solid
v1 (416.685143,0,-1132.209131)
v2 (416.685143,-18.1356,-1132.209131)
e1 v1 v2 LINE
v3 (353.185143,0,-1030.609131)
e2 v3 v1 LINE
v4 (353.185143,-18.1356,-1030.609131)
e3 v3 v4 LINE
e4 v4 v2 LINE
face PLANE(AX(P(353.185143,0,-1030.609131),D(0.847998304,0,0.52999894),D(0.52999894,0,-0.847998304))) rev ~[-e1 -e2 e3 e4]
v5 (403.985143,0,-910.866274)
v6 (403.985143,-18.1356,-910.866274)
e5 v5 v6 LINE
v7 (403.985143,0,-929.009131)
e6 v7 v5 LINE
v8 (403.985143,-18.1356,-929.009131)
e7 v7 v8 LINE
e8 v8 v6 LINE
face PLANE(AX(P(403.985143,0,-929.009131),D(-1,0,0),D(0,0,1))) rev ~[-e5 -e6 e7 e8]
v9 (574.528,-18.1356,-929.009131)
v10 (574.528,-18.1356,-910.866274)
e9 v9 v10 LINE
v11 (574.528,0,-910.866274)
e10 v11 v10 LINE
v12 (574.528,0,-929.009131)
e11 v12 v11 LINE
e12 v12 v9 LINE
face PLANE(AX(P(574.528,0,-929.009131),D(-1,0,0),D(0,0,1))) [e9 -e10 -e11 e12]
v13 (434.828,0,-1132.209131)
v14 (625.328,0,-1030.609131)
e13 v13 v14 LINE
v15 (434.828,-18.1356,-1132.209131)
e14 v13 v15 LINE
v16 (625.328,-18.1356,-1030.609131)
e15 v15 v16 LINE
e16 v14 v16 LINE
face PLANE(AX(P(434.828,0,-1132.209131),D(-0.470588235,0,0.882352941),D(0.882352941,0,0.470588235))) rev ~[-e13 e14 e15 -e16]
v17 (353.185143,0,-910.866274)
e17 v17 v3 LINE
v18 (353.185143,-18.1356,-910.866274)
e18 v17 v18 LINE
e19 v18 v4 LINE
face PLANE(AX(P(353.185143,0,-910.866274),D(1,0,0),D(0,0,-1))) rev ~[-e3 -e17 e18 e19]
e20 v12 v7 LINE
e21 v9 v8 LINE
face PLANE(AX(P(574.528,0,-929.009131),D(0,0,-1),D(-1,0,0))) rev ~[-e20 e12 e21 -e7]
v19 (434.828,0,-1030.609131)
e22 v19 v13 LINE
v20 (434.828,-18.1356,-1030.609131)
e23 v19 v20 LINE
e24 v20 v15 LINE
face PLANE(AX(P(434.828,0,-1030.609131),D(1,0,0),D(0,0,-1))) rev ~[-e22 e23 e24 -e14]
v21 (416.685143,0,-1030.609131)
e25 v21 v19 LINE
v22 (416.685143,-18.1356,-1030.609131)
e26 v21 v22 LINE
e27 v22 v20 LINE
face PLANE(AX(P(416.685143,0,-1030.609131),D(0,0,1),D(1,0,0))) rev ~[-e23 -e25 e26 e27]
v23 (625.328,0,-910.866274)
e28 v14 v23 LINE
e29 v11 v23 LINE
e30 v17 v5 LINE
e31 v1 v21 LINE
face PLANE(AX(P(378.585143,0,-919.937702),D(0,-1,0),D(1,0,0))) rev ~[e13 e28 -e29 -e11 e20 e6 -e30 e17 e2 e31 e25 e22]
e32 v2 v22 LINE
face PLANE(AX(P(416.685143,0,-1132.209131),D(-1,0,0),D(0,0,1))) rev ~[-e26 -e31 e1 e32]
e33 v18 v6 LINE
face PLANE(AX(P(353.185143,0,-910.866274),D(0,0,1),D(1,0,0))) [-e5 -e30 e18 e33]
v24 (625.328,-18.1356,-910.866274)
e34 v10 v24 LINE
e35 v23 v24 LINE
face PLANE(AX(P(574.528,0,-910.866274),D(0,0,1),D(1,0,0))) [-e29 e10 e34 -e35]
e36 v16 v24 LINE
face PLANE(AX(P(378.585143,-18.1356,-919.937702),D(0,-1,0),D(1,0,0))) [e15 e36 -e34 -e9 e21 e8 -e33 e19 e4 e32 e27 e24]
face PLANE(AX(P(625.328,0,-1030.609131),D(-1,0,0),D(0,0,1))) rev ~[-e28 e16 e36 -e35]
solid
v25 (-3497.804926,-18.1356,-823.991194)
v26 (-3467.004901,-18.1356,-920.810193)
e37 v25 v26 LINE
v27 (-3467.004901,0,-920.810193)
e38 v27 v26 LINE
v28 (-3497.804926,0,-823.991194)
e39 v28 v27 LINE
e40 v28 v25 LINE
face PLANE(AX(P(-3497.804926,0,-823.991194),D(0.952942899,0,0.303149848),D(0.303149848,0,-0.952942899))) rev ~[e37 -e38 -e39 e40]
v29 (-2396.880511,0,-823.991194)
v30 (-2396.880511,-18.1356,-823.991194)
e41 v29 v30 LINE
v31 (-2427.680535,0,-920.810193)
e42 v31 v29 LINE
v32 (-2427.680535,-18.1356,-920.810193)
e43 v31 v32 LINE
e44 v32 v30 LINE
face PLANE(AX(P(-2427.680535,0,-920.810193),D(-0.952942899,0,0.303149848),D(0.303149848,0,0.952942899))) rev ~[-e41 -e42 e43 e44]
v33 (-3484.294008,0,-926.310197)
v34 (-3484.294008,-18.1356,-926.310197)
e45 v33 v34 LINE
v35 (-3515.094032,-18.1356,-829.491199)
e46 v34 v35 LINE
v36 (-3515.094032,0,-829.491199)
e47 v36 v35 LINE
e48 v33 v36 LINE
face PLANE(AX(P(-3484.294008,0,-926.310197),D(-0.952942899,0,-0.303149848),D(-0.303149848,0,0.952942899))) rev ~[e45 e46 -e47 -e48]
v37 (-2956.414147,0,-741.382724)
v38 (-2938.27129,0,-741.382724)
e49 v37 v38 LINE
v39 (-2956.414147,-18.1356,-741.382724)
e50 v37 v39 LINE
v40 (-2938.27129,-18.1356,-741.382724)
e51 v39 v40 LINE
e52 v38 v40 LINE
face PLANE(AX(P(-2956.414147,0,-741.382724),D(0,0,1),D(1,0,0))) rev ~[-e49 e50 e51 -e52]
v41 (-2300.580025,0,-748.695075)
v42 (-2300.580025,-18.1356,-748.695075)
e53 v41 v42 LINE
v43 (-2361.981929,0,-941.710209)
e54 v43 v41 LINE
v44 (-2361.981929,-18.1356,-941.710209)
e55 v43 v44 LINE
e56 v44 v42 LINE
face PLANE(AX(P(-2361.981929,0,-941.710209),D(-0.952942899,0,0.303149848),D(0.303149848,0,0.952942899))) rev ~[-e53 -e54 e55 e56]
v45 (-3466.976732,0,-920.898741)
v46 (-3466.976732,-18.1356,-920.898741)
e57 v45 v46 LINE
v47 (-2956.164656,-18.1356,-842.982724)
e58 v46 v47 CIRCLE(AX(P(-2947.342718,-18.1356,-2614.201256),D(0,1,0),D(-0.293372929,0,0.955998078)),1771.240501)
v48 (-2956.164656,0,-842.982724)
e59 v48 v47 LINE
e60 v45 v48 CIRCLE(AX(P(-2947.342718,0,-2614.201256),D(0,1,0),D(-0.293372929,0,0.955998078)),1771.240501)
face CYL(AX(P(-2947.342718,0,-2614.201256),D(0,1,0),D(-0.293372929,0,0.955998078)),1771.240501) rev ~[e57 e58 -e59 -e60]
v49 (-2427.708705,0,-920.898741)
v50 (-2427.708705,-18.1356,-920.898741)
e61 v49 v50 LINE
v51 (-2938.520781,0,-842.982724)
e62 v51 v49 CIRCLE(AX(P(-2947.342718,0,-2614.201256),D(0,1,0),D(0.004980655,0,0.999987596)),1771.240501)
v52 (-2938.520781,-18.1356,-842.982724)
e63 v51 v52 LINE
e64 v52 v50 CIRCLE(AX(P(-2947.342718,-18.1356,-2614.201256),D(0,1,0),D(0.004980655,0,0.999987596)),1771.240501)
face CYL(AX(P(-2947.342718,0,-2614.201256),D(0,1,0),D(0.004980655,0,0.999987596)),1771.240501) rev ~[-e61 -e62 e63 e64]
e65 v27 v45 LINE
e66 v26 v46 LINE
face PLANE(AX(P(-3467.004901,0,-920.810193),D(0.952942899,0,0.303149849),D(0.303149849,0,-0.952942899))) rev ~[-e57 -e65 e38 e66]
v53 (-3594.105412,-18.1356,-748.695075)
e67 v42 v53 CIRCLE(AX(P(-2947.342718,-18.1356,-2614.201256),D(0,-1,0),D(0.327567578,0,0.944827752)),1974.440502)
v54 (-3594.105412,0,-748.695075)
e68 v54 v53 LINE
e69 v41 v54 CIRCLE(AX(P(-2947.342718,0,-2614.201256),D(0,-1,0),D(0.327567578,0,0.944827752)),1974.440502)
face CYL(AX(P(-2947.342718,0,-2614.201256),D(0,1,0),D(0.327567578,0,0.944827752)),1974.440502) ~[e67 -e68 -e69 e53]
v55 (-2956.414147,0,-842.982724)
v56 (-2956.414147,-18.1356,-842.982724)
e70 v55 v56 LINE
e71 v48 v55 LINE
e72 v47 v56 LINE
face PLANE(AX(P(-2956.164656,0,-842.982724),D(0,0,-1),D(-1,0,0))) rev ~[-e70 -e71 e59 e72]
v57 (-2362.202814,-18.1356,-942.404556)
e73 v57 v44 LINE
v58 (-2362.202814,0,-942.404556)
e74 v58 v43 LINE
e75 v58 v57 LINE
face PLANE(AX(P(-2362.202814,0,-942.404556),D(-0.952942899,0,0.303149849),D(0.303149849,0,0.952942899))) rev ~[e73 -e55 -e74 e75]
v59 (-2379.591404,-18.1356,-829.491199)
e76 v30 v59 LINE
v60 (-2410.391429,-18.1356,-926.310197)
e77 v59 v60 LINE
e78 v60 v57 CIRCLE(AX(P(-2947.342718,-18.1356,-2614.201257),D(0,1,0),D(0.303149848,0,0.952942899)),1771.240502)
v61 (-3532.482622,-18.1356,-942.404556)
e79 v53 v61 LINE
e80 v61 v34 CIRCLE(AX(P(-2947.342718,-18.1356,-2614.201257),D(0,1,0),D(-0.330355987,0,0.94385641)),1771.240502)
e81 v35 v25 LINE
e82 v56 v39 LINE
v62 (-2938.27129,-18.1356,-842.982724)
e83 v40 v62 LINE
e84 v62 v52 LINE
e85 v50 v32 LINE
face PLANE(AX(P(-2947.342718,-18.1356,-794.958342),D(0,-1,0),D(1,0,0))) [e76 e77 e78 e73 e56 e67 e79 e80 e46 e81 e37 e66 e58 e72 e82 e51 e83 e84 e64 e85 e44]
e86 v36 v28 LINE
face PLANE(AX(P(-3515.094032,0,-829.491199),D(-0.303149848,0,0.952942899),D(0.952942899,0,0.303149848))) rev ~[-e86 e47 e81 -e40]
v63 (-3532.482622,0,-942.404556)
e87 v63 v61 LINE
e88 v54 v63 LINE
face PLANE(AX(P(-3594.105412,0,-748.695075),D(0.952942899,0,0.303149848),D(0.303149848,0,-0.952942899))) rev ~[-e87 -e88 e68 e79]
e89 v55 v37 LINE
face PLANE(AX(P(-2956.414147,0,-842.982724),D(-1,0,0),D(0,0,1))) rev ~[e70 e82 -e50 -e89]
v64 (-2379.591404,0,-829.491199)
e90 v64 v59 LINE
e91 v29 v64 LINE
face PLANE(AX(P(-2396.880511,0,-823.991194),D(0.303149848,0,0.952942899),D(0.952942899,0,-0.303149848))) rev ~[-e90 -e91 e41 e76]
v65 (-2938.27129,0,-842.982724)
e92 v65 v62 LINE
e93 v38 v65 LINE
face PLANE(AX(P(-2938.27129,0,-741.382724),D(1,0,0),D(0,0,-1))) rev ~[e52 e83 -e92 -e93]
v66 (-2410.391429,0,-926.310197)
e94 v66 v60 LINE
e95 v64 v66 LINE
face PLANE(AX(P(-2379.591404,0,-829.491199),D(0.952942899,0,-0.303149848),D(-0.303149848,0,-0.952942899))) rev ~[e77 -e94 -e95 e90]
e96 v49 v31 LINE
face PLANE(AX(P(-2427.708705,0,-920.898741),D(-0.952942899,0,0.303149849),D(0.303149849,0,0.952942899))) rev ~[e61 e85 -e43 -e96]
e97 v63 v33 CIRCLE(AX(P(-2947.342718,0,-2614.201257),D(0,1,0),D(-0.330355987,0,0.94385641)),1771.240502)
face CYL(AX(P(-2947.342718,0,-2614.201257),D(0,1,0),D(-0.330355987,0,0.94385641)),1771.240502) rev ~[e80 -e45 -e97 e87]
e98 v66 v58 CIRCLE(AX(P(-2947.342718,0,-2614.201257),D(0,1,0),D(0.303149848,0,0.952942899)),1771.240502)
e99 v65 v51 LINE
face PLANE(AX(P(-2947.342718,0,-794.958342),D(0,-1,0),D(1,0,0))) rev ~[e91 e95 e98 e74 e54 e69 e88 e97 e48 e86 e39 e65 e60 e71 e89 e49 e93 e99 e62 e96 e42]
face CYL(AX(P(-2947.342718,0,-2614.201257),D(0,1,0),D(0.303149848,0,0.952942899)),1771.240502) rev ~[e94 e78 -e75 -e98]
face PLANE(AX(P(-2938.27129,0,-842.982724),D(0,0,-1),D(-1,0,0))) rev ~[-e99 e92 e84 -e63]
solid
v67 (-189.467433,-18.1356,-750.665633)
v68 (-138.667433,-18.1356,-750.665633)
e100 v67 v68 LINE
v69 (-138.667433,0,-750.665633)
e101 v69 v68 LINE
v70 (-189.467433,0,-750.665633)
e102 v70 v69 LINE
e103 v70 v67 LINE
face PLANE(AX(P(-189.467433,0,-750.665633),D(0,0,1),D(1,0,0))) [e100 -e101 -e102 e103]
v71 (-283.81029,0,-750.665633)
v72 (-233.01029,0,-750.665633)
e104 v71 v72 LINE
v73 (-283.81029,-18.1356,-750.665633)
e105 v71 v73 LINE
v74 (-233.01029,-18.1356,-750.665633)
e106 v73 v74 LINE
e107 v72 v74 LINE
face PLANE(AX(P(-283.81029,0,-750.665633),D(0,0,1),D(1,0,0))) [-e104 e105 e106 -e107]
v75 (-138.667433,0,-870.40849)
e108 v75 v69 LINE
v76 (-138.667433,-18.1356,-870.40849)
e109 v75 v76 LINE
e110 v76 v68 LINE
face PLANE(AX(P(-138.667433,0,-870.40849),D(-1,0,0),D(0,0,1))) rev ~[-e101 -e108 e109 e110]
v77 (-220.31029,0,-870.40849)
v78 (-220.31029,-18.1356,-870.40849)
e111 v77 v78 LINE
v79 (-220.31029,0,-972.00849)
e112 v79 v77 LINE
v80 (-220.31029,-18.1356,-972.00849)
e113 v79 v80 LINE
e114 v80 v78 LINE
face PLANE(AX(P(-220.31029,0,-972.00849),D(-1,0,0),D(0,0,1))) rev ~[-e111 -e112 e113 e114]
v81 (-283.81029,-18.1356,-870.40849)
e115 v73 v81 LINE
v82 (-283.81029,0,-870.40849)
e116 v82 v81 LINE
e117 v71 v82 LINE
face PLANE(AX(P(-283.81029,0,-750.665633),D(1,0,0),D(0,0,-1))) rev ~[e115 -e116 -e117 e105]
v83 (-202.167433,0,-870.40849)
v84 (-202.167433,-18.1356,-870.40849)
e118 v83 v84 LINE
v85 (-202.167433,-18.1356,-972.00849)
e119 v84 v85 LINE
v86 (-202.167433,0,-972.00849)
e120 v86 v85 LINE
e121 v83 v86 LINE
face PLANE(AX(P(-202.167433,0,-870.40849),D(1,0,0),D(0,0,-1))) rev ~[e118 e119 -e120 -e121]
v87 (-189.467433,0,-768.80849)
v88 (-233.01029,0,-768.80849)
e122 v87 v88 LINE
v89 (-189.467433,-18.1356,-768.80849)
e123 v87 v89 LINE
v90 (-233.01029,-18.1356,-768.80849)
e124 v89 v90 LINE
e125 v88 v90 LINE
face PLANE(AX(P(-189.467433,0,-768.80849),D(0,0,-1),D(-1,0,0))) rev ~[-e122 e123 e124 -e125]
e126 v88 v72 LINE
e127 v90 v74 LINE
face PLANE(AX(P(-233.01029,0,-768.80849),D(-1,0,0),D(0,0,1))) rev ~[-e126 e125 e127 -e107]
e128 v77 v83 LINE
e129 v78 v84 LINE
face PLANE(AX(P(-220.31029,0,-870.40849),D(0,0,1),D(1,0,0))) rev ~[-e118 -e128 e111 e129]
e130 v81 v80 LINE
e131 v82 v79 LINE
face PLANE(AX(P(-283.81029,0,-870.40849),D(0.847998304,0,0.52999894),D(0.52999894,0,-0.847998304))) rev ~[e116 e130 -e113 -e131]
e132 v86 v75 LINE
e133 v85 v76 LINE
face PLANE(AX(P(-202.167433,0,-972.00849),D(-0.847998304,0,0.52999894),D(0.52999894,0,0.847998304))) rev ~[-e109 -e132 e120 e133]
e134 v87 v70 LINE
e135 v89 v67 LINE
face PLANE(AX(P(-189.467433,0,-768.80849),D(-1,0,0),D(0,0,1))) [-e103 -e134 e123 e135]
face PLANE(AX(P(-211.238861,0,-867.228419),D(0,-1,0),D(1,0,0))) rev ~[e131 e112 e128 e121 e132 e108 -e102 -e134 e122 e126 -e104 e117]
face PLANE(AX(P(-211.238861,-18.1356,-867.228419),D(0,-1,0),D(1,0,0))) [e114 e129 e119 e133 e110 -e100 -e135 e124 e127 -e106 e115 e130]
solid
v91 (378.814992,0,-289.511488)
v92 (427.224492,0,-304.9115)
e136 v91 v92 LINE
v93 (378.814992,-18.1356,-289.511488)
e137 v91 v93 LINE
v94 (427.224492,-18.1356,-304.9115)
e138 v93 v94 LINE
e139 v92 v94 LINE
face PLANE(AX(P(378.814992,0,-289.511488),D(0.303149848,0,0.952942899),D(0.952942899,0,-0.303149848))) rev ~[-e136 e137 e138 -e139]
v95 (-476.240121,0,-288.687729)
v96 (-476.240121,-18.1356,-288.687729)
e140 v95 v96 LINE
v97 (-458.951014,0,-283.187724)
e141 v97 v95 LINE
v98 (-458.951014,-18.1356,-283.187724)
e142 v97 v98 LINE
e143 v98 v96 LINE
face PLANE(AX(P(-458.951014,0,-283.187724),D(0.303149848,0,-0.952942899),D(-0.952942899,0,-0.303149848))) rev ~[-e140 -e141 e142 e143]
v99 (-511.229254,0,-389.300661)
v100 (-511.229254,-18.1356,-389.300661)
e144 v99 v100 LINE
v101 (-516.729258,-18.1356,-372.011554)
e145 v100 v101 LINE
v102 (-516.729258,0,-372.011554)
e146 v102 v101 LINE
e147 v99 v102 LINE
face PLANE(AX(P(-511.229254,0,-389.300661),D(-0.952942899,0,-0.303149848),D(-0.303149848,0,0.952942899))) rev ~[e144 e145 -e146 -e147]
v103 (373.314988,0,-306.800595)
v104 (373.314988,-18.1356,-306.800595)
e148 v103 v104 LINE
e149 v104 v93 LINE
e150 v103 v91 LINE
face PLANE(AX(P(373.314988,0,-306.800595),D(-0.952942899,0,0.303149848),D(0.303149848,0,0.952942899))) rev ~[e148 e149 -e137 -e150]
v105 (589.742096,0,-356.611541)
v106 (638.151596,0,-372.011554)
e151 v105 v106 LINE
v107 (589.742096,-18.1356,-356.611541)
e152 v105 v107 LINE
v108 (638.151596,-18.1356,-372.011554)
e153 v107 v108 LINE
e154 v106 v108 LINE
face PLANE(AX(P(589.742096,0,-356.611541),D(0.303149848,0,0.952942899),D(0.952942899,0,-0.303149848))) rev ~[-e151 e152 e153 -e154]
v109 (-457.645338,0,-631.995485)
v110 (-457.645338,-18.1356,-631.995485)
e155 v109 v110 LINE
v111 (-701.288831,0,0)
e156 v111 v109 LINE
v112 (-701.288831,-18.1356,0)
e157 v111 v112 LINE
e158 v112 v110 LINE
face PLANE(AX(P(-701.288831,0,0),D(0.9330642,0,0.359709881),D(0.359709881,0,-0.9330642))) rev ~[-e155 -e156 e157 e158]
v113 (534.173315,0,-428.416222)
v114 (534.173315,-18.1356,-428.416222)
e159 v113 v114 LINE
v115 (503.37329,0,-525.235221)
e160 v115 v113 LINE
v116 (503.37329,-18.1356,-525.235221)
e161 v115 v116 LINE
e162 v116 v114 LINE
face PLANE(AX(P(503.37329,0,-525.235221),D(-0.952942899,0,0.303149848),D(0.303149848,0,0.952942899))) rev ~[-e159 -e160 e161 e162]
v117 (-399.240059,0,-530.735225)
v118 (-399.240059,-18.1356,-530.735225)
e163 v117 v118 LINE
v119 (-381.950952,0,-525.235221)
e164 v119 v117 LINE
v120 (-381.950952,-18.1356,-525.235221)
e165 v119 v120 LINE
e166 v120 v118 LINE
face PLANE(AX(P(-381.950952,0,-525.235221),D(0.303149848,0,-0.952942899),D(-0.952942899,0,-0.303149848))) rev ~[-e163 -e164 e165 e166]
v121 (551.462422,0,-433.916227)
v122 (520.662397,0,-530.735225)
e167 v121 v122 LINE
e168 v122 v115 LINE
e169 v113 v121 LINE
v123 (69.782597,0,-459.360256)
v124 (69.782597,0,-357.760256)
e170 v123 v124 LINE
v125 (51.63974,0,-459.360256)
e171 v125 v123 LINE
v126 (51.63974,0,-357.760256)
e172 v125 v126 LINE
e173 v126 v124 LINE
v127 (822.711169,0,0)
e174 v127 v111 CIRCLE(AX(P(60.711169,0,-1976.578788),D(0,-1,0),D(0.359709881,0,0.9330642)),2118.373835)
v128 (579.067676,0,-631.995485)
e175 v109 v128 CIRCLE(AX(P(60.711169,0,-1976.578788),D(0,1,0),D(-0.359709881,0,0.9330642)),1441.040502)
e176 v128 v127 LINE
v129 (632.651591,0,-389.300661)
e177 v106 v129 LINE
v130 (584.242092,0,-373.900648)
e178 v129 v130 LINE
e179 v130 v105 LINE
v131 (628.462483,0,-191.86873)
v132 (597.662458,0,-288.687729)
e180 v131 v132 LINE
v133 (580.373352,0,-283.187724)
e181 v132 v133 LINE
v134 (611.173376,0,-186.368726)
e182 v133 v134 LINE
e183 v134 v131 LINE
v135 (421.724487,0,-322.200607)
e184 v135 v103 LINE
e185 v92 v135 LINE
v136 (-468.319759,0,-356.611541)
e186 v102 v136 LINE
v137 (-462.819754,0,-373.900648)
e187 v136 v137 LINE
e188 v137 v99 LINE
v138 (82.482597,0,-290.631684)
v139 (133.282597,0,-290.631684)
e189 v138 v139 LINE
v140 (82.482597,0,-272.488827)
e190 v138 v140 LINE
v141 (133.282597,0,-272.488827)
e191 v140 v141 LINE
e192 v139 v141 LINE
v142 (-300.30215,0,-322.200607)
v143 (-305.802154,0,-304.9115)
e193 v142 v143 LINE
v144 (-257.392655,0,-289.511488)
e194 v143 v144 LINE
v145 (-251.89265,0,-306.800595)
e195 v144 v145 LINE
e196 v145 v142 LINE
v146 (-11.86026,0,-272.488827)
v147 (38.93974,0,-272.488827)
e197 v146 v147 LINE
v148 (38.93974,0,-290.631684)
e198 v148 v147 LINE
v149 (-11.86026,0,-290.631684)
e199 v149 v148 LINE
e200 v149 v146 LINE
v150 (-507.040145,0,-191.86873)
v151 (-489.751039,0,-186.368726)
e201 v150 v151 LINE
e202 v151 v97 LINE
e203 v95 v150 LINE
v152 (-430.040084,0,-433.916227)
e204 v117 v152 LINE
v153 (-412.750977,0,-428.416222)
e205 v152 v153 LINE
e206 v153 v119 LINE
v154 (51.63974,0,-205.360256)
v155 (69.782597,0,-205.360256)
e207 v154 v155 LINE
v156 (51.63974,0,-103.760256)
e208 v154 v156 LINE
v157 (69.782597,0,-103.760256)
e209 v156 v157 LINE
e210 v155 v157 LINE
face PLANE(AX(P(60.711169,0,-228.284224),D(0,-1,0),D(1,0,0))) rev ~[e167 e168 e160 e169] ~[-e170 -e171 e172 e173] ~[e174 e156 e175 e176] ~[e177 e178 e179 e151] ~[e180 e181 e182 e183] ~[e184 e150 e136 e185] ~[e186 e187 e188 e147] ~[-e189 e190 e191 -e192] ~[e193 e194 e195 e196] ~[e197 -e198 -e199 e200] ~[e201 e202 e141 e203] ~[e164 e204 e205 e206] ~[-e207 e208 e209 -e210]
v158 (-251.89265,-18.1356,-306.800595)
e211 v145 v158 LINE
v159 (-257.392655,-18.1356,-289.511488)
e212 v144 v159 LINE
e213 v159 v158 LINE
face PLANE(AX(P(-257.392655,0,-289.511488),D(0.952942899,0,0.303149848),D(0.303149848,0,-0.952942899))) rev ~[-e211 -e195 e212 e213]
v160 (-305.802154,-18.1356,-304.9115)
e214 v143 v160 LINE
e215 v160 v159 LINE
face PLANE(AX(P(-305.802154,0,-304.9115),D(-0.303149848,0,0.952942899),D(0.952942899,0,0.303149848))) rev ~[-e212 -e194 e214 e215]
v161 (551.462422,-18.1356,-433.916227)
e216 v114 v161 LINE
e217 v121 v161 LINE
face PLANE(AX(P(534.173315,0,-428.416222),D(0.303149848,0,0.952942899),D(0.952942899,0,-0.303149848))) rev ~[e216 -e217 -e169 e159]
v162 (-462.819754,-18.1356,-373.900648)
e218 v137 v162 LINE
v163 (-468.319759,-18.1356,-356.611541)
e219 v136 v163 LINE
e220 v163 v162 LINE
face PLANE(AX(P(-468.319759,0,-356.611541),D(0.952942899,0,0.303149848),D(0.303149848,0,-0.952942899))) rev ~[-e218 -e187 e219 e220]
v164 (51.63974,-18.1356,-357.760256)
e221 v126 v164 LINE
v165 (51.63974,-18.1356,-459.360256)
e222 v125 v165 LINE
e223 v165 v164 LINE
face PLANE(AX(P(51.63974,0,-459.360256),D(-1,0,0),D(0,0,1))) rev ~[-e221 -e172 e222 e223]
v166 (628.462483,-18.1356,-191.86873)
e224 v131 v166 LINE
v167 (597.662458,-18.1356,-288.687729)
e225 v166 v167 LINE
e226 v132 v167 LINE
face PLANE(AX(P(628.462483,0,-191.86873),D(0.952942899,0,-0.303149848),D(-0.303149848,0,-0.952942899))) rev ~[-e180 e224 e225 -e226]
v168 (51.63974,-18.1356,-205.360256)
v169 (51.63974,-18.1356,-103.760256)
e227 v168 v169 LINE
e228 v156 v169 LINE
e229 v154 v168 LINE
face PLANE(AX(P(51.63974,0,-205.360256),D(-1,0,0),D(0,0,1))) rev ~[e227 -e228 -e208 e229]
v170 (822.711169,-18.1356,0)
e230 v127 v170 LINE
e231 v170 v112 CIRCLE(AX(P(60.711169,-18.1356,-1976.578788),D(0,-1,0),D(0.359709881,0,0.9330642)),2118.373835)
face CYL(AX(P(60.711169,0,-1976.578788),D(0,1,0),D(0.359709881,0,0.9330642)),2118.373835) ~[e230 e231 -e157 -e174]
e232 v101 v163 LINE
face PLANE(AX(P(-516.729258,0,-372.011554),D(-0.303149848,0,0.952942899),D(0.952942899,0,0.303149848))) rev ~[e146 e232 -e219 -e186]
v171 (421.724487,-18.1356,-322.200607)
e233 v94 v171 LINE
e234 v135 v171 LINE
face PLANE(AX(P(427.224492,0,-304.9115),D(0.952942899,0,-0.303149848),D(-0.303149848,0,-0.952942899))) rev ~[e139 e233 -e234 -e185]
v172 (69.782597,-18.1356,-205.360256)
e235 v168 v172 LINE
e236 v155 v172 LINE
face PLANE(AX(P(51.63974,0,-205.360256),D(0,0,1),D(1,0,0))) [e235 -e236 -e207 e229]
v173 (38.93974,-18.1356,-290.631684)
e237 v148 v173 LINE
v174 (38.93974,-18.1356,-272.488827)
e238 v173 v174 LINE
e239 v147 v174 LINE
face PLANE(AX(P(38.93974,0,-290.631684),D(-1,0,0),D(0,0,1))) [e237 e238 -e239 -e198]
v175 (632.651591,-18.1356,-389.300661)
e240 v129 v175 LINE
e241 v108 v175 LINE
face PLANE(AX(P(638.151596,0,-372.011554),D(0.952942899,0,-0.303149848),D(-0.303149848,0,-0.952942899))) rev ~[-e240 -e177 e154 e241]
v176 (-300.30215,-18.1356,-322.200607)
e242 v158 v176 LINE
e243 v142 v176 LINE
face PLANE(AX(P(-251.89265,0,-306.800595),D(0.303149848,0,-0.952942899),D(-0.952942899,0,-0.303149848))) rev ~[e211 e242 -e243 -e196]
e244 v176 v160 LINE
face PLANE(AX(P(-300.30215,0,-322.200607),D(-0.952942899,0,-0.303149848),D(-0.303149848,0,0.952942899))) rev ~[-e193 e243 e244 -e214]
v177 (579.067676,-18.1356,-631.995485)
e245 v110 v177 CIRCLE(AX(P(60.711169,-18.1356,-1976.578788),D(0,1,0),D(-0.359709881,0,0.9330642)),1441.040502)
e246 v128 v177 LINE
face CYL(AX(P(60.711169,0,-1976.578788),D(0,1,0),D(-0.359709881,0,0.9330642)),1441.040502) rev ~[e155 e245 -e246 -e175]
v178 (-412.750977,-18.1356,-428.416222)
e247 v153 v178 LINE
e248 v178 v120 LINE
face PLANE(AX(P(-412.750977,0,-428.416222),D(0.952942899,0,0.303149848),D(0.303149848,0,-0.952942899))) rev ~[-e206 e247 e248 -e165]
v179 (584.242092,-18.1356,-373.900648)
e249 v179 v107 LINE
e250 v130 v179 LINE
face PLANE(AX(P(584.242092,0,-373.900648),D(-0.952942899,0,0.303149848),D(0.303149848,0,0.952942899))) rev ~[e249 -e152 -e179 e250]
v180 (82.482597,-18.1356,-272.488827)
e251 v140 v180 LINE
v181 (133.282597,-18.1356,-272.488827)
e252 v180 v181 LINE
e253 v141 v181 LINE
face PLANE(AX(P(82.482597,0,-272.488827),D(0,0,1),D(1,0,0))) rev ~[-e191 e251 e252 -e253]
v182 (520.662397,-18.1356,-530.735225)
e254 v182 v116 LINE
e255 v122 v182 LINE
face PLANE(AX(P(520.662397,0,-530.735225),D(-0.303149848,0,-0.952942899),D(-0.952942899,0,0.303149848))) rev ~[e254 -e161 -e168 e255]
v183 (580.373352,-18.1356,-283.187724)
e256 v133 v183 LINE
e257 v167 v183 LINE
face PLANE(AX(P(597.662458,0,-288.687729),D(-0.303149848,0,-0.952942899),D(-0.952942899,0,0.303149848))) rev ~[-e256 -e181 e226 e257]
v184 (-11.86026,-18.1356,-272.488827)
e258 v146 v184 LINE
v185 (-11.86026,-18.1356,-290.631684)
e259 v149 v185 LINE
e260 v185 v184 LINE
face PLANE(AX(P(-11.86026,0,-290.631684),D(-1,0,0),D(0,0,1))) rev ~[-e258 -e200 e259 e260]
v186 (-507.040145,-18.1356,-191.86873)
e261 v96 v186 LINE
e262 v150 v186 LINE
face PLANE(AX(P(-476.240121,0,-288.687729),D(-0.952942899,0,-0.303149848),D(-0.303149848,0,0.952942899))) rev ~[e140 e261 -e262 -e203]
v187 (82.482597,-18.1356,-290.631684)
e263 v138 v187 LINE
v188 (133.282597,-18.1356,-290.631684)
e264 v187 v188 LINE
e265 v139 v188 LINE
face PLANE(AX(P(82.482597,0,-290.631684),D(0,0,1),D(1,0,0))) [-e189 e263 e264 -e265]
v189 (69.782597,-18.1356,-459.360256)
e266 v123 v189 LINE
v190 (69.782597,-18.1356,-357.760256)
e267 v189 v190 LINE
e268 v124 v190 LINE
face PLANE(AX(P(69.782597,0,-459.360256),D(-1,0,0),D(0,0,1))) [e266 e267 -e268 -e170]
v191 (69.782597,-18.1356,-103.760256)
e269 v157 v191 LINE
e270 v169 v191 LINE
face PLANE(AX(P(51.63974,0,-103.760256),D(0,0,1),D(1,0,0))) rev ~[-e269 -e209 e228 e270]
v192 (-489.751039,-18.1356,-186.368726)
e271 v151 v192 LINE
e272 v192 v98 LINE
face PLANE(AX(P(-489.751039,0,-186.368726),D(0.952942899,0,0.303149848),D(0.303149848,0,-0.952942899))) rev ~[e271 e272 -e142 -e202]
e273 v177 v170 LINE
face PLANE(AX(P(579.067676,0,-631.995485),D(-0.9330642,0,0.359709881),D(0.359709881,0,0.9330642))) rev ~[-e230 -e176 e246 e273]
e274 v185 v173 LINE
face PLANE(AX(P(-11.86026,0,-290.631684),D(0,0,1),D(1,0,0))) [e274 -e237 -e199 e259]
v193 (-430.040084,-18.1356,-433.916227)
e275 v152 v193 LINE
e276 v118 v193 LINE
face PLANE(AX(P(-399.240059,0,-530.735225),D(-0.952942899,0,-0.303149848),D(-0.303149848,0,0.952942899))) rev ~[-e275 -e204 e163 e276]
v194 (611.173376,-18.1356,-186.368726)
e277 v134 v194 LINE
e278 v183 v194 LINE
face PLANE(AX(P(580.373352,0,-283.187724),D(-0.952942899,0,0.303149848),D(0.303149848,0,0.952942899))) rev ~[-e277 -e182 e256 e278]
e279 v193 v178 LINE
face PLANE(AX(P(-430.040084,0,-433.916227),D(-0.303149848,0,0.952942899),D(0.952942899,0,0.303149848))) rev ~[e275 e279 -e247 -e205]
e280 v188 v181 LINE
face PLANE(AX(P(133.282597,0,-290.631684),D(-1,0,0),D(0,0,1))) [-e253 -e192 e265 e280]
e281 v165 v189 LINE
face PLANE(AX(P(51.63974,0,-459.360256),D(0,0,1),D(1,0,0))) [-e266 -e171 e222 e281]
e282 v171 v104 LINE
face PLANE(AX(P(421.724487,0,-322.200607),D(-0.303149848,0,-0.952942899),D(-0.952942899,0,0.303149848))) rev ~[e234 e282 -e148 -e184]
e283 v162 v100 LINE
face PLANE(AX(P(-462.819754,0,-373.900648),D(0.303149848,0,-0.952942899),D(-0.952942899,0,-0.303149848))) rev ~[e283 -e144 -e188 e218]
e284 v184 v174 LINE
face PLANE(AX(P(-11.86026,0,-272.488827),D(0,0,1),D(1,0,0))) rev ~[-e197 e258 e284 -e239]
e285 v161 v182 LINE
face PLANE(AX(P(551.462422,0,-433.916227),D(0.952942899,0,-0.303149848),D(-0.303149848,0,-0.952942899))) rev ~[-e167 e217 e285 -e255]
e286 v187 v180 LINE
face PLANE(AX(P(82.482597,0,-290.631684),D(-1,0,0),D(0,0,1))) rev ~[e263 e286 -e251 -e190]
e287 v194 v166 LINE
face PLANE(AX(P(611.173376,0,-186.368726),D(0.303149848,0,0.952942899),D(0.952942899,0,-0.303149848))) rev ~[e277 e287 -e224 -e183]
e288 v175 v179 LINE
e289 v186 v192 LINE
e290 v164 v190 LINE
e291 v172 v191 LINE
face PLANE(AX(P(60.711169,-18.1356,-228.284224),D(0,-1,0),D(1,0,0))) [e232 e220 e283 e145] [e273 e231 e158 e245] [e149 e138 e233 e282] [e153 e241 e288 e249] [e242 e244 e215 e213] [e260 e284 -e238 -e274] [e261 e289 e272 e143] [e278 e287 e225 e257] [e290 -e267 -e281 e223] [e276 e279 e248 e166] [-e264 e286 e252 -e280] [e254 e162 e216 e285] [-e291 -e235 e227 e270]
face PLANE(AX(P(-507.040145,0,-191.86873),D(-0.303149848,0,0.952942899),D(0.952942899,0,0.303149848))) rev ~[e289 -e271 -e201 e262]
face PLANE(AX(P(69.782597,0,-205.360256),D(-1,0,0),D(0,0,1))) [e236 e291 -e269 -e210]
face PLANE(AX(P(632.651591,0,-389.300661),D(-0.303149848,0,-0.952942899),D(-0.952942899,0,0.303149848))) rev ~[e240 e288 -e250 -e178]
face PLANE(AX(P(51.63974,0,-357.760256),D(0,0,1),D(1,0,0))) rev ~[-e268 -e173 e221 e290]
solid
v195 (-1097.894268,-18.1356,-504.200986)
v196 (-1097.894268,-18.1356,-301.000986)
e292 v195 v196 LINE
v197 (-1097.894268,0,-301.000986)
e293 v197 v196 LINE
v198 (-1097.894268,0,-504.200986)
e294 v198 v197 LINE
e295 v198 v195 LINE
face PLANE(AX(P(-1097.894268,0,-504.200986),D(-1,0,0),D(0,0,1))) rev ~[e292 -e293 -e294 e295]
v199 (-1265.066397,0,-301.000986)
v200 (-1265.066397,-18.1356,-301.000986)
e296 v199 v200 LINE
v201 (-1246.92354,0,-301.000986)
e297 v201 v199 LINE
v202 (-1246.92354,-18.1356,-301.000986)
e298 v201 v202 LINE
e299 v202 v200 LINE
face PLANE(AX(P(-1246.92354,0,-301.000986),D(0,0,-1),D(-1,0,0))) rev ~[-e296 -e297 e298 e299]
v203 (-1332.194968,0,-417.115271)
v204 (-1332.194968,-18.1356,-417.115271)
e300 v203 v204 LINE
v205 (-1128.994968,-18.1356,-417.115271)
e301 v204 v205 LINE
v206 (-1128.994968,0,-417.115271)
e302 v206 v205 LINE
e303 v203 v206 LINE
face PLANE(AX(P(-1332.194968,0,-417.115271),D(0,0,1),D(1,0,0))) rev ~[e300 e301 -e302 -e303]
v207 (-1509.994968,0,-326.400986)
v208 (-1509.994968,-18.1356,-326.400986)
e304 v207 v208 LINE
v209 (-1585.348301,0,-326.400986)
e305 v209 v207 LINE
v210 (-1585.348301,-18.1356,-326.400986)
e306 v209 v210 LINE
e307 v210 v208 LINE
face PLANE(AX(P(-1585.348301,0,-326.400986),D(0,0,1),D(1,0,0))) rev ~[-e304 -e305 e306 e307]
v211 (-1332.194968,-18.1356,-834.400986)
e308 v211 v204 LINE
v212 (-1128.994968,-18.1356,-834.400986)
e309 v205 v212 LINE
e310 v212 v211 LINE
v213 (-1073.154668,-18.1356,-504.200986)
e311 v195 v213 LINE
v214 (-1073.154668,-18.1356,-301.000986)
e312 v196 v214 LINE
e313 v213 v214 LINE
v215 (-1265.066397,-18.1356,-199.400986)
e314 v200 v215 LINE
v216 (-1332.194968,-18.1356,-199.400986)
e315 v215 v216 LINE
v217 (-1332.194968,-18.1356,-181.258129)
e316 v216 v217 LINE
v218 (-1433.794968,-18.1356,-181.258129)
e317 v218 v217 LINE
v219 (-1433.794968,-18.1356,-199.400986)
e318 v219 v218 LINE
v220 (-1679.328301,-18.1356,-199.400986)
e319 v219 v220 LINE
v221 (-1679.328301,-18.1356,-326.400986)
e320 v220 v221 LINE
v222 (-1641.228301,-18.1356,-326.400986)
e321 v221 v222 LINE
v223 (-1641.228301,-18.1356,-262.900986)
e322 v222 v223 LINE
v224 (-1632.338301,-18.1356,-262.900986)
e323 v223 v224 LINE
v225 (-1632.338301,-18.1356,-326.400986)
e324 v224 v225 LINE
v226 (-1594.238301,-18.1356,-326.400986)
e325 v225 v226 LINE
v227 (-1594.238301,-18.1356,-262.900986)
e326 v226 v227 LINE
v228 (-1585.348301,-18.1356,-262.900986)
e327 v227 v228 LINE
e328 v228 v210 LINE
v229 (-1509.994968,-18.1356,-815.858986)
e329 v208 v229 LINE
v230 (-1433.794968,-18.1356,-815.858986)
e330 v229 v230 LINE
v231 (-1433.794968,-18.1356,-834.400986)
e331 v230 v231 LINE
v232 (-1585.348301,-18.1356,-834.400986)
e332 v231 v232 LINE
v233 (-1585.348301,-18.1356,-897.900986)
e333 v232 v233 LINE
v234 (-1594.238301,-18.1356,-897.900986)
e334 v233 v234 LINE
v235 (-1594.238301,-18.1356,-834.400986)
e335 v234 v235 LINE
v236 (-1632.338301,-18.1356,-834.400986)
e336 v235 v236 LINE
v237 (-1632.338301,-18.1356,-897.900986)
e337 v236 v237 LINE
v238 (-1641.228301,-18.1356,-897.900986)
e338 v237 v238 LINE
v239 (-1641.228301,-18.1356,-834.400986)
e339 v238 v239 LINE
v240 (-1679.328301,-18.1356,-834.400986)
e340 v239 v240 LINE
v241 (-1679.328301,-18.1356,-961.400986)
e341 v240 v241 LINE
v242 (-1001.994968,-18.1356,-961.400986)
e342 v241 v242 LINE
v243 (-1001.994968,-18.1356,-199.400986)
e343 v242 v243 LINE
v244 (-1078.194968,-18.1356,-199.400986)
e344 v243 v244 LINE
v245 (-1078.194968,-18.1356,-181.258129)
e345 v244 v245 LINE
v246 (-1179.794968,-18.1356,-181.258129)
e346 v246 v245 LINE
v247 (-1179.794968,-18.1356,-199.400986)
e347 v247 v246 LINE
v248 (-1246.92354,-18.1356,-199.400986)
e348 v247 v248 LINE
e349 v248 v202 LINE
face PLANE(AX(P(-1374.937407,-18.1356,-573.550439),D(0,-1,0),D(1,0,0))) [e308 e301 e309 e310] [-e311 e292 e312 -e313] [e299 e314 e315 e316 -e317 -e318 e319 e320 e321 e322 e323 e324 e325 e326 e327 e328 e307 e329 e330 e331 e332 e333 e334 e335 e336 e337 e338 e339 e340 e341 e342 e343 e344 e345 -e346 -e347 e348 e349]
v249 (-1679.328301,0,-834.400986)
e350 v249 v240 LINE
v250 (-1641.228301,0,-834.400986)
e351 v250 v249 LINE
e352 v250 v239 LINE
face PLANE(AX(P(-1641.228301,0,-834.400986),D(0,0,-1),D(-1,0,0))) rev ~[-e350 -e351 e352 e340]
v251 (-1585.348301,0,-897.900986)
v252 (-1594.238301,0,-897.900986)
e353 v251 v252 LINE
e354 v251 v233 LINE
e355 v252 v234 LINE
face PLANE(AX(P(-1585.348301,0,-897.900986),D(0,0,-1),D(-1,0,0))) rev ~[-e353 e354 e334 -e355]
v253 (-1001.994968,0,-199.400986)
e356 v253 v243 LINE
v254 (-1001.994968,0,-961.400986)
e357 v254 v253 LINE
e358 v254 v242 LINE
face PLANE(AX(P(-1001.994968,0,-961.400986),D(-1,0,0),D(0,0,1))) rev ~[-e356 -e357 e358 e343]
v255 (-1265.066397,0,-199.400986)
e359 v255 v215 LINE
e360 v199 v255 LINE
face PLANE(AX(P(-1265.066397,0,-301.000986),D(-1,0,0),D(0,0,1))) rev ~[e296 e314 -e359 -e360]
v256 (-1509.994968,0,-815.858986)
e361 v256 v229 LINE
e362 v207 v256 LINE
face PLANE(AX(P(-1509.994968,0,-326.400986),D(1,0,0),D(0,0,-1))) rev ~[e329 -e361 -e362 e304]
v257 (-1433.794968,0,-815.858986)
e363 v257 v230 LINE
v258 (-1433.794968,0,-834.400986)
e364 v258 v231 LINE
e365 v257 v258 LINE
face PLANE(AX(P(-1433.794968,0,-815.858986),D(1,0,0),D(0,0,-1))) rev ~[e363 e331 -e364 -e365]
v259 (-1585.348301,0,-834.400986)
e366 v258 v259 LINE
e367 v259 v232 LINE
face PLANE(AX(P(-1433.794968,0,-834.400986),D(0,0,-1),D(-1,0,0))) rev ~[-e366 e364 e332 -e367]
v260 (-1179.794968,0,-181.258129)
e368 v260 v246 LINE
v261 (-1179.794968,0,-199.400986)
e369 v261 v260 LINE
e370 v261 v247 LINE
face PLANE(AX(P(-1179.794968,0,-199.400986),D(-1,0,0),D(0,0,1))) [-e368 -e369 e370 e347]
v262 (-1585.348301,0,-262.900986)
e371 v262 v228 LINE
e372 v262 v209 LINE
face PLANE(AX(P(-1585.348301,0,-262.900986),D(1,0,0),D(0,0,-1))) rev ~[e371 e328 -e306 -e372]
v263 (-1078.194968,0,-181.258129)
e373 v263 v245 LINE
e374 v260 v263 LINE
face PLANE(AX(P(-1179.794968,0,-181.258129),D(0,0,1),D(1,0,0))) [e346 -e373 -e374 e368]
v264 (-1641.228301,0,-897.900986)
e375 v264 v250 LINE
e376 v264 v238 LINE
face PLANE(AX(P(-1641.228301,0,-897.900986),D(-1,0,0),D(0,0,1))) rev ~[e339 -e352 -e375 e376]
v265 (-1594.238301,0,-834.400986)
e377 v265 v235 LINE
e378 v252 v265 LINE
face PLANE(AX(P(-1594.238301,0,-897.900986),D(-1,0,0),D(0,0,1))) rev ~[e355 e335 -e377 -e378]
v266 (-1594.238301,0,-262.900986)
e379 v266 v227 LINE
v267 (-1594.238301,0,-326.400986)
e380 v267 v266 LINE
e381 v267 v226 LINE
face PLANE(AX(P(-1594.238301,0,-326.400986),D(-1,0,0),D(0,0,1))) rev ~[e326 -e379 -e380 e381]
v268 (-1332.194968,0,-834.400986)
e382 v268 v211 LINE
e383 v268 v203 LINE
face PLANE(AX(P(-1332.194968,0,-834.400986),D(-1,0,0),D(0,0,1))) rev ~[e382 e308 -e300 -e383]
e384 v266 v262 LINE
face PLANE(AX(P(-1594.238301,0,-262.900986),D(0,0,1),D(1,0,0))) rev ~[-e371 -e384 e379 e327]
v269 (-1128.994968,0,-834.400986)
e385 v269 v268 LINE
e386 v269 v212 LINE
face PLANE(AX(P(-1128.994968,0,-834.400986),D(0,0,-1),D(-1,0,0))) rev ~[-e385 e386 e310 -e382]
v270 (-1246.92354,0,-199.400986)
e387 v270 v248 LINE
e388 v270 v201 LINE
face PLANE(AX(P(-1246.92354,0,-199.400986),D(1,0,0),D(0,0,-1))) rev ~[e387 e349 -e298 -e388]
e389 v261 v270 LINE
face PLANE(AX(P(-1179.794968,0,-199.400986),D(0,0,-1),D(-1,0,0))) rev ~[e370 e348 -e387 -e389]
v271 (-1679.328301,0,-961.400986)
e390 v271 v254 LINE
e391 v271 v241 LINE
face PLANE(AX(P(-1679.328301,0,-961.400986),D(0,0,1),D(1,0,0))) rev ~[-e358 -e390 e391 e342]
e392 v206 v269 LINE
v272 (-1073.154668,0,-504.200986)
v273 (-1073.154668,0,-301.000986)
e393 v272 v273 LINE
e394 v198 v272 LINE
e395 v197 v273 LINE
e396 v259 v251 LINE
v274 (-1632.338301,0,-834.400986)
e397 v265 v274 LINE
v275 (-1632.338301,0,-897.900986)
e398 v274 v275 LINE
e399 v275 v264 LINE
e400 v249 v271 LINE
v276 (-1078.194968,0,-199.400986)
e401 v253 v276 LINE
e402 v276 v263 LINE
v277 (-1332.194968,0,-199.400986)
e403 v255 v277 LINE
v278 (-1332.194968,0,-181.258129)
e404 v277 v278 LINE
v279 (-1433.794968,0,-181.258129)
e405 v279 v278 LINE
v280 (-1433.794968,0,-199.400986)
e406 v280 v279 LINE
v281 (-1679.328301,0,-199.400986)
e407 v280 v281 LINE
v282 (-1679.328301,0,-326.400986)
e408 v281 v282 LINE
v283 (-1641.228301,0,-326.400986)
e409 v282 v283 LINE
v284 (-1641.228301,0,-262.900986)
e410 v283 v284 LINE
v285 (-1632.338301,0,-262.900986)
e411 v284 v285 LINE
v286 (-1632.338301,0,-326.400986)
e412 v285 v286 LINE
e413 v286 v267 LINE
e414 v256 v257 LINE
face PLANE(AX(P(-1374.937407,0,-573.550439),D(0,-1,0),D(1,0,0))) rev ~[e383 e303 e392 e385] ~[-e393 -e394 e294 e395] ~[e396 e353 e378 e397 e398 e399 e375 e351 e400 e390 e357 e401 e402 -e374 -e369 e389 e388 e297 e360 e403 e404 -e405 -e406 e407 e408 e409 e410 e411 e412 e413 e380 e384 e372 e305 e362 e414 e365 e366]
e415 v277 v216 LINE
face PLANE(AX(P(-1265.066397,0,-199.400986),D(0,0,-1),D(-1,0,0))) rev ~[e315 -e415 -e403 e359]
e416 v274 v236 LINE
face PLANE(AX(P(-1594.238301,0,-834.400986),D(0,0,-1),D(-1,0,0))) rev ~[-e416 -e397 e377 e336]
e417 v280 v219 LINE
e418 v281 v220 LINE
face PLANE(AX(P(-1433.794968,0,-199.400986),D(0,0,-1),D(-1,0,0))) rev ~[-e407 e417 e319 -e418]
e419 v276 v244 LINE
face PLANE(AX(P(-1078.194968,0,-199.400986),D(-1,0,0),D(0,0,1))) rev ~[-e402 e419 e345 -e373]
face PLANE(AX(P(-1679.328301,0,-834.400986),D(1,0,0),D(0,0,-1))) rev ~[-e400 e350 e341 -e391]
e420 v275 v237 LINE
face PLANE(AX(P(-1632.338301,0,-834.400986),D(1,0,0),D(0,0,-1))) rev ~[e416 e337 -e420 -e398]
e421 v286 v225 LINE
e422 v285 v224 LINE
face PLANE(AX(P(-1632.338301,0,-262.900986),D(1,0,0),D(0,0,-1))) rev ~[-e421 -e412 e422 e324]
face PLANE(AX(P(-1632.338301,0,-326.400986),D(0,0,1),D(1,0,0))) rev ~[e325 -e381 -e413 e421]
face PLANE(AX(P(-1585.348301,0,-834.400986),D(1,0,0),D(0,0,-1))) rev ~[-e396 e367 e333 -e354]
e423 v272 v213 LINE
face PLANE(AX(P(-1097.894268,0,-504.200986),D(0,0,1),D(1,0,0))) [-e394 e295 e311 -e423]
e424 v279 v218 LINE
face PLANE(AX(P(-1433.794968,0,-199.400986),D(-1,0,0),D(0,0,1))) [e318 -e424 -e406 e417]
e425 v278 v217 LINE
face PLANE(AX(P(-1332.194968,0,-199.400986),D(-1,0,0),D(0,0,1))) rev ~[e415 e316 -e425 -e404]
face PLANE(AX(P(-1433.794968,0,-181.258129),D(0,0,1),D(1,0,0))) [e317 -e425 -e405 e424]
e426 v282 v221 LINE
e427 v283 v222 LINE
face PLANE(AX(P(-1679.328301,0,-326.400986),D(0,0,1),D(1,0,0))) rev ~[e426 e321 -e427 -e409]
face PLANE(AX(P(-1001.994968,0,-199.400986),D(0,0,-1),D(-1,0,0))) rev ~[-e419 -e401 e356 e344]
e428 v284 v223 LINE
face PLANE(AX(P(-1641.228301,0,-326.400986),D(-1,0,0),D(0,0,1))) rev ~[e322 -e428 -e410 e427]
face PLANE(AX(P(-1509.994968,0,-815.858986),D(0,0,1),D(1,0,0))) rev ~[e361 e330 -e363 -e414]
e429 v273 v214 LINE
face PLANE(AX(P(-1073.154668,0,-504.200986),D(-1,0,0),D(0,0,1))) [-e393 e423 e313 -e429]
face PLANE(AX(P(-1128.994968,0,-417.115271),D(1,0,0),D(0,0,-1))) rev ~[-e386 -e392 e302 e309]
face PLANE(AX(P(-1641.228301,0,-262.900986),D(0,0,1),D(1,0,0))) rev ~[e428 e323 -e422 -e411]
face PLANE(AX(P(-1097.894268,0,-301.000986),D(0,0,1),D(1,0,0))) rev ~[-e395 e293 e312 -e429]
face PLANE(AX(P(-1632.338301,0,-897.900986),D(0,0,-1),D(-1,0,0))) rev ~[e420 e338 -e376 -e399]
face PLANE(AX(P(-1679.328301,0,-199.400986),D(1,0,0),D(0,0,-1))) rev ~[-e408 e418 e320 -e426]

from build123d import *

# Parameters (mm, degrees)
F0_W     = 24.7396
F0_H     = 203.2
F0_W_2   = 101.6
F0_H_2   = 18.1428571429
F1_DEPTH = 18.1356
F0_W_3   = 50.8
F0_W_4   = 18.1428571429
F0_H_3   = 101.6


# Not quite as in the source:
# - a feature names something its author has since deleted; it is built from what else it names


with BuildPart() as f1:
    # F0 (on Front) → F1 (new body)
    with BuildSketch(Plane.XZ):
        Polygon((-1433.7949680964, -199.4009857178), (-1509.9949680964, -199.4009857178), (-1679.3283014297, -199.4009857178), (-1679.3283014297, -326.4009857178), (-1641.2283014297, -326.4009857178), (-1641.2283014297, -262.9009857178), (-1632.3383014297, -262.9009857178), (-1632.3383014297, -326.4009857178), (-1594.2383014297, -326.4009857178), (-1594.2383014297, -262.9009857178), (-1585.3483014297, -262.9009857178), (-1585.3483014297, -326.4009857178), (-1509.9949680964, -326.4009857178), (-1509.9949680964, -815.8589857178), (-1433.7949680964, -815.8589857178), (-1433.7949680964, -834.4009857178), (-1509.9949680964, -834.4009857178), (-1585.3483014297, -834.4009857178), (-1585.3483014297, -897.9009857178), (-1594.2383014297, -897.9009857178), (-1594.2383014297, -834.4009857178), (-1632.3383014297, -834.4009857178), (-1632.3383014297, -897.9009857178), (-1641.2283014297, -897.9009857178), (-1641.2283014297, -834.4009857178), (-1679.3283014297, -834.4009857178), (-1679.3283014297, -961.4009857178), (-1509.9949680964, -961.4009857178), (-1001.9949680964, -961.4009857178), (-1001.9949680964, -199.4009857178), (-1078.1949680964, -199.4009857178), (-1179.7949680964, -199.4009857178), (-1246.923539525, -199.4009857178), (-1246.923539525, -301.0009857178), (-1265.0663966678, -301.0009857178), (-1265.0663966678, -199.4009857178), (-1332.1949680964, -199.4009857178), align=None)
        Polygon((-1332.1949680964, -815.8589857178), (-1332.1949680964, -417.1152714321), (-1128.9949680964, -417.1152714321), (-1128.9949680964, -834.4009857178), (-1332.1949680964, -834.4009857178), align=None, mode=Mode.SUBTRACT)
        with Locations((-1085.5244682964, -402.6009857178)):
            Rectangle(F0_W, F0_H, mode=Mode.SUBTRACT)
        with Locations((-1382.9949680964, -190.3295571463)):
            Rectangle(F0_W_2, F0_H_2)
        with Locations((-1128.9949680964, -190.3295571463)):
            Rectangle(F0_W_2, F0_H_2)
    extrude(amount=F1_DEPTH)


with BuildPart() as f1b:
    # F0 (on Front) → F1, piece 2 (new body)
    with BuildSketch(Plane.XZ):
        Polygon((-233.0102896554, -768.8084903581), (-283.8102896554, -768.8084903581), (-283.8102896554, -870.4084903581), (-220.3102896554, -972.0084903581), (-220.3102896554, -870.4084903581), (-202.1674325126, -870.4084903581), (-202.1674325126, -972.0084903581), (-138.6674325126, -870.4084903581), (-138.6674325126, -768.8084903581), (-189.4674325126, -768.8084903581), align=None)
        with Locations((-164.0674325126, -759.7370617867)):
            Rectangle(F0_W_3, F0_H_2)
        with Locations((-258.4102896554, -759.7370617867)):
            Rectangle(F0_W_3, F0_H_2)
    extrude(amount=F1_DEPTH)


with BuildPart() as f1c:
    # F0 (on Front) → F1, piece 3 (new body)
    with BuildSketch(Plane.XZ):
        with BuildLine():
            Line((579.0676760834, -631.9954848741), (822.7111688002, 0))
            ThreePointArc((822.7111688002, 0), (60.7111688002, 141.7950471023), (-701.2888311998, 0))
            Line((-701.2888311998, 0), (-457.6453384831, -631.9954848741))
            ThreePointArc((-457.6453384831, -631.9954848741), (60.7111688002, -535.538286231), (579.0676760834, -631.9954848741))
        make_face()
        Polygon((-399.240059352, -530.7352252685), (-430.0400839584, -433.9162266978), (-412.7509770708, -428.4162223038), (-381.9509524643, -525.2352208745), align=None, mode=Mode.SUBTRACT)
        Polygon((-511.2292535639, -389.3006605456), (-516.7292579579, -372.011553658), (-468.3197586725, -356.6115413548), (-462.8197542785, -373.9006482424), align=None, mode=Mode.SUBTRACT)
        Polygon((-458.9510139804, -283.1877244477), (-476.2401208681, -288.6877288417), (-507.0401454745, -191.8687302709), (-489.7510385869, -186.3687258769), align=None, mode=Mode.SUBTRACT)
        with Locations((60.7111688002, -408.5602558806)):
            Rectangle(F0_W_4, F0_H_3, mode=Mode.SUBTRACT)
        Polygon((534.1733146711, -428.4162223038), (551.4624215588, -433.9162266978), (520.6623969523, -530.7352252685), (503.3732900647, -525.2352208745), align=None, mode=Mode.SUBTRACT)
        Polygon((589.7420962729, -356.6115413548), (638.1515955583, -372.011553658), (632.6515911643, -389.3006605456), (584.2420918789, -373.9006482424), align=None, mode=Mode.SUBTRACT)
        Polygon((-300.3021495348, -322.2006069388), (-305.8021539288, -304.9115000511), (-257.3926546434, -289.5114877479), (-251.8926502494, -306.8005946355), align=None, mode=Mode.SUBTRACT)
        with Locations((13.5397402287, -281.5602558806)):
            Rectangle(F0_W_3, F0_H_2, mode=Mode.SUBTRACT)
        with Locations((107.8825973716, -281.5602558806)):
            Rectangle(F0_W_3, F0_H_2, mode=Mode.SUBTRACT)
        Polygon((373.3149878497, -306.8005946355), (378.8149922437, -289.5114877479), (427.2244915291, -304.9115000511), (421.7244871351, -322.2006069388), align=None, mode=Mode.SUBTRACT)
        Polygon((628.4624830749, -191.8687302709), (597.6624584684, -288.6877288417), (580.3733515808, -283.1877244477), (611.1733761872, -186.3687258769), align=None, mode=Mode.SUBTRACT)
        with Locations((60.7111688002, -154.5602558806)):
            Rectangle(F0_W_4, F0_H_3, mode=Mode.SUBTRACT)
    extrude(amount=F1_DEPTH)


with BuildPart() as f1d:
    # F0 (on Front) → F1, piece 4 (new body)
    with BuildSketch(Plane.XZ):
        with Locations((378.5851431642, -919.9377022879)):
            Rectangle(F0_W_3, F0_H_2)
        Polygon((403.9851431642, -929.0091308594), (353.1851431642, -929.0091308594), (353.1851431642, -1030.6091308594), (416.6851431642, -1132.2091308594), (416.6851431642, -1030.6091308594), (434.8280003071, -1030.6091308594), (434.8280003071, -1132.2091308594), (625.3280003071, -1030.6091308594), (625.3280003071, -929.0091308594), (574.5280003071, -929.0091308594), align=None)
        with Locations((599.9280003071, -919.9377022879)):
            Rectangle(F0_W_3, F0_H_2)
    extrude(amount=F1_DEPTH)


with BuildPart() as f1e:
    # F0 (on Front) → F1, piece 5 (new body)
    with BuildSketch(Plane.XZ):
        with BuildLine():
            Line((-2956.4141467797, -741.3827241583), (-2938.2712896368, -741.3827241583))
            Line((-2938.2712896368, -741.3827241583), (-2938.2712896368, -842.9827241583))
            Line((-2938.2712896368, -842.9827241583), (-2938.5207805782, -842.9827241583))
            ThreePointArc((-2938.5207805782, -842.9827241583), (-2680.2581818501, -863.2133164178), (-2427.7087045022, -920.8987414075))
            Line((-2427.7087045022, -920.8987414075), (-2427.6805354276, -920.8101927253))
            Line((-2427.6805354276, -920.8101927253), (-2396.8805108212, -823.9911941546))
            Line((-2396.8805108212, -823.9911941546), (-2379.5914039336, -829.4911985486))
            Line((-2379.5914039336, -829.4911985486), (-2410.39142854, -926.3101971193))
            ThreePointArc((-2410.39142854, -926.3101971193), (-2386.2394133775, -934.184590775), (-2362.202814439, -942.4045556973))
            Line((-2362.202814439, -942.4045556973), (-2361.9819292546, -941.7102094226))
            Line((-2361.9819292546, -941.7102094226), (-2331.1819046482, -844.8912108518))
            Line((-2331.1819046482, -844.8912108518), (-2300.5800248164, -748.6950747267))
            ThreePointArc((-2300.5800248164, -748.6950747267), (-2947.3427182083, -639.7607545087), (-3594.1054116001, -748.6950747267))
            Line((-3594.1054116001, -748.6950747267), (-3532.4826219776, -942.4045556973))
            ThreePointArc((-3532.4826219776, -942.4045556973), (-3508.446023039, -934.184590775), (-3484.2940078765, -926.3101971193))
            Line((-3484.2940078765, -926.3101971193), (-3515.0940324829, -829.4911985486))
            Line((-3515.0940324829, -829.4911985486), (-3497.8049255953, -823.9911941546))
            Line((-3497.8049255953, -823.9911941546), (-3467.0049009889, -920.8101927253))
            Line((-3467.0049009889, -920.8101927253), (-3466.9767319143, -920.8987414075))
            ThreePointArc((-3466.9767319143, -920.8987414075), (-3214.4272545664, -863.2133164178), (-2956.1646558383, -842.9827241583))
            Line((-2956.1646558383, -842.9827241583), (-2956.4141467797, -842.9827241583))
            Line((-2956.4141467797, -842.9827241583), (-2956.4141467797, -741.3827241583))
        make_face()
    extrude(amount=F1_DEPTH)


solid = Compound([f1.part, f1b.part, f1c.part, f1d.part, f1e.part])
